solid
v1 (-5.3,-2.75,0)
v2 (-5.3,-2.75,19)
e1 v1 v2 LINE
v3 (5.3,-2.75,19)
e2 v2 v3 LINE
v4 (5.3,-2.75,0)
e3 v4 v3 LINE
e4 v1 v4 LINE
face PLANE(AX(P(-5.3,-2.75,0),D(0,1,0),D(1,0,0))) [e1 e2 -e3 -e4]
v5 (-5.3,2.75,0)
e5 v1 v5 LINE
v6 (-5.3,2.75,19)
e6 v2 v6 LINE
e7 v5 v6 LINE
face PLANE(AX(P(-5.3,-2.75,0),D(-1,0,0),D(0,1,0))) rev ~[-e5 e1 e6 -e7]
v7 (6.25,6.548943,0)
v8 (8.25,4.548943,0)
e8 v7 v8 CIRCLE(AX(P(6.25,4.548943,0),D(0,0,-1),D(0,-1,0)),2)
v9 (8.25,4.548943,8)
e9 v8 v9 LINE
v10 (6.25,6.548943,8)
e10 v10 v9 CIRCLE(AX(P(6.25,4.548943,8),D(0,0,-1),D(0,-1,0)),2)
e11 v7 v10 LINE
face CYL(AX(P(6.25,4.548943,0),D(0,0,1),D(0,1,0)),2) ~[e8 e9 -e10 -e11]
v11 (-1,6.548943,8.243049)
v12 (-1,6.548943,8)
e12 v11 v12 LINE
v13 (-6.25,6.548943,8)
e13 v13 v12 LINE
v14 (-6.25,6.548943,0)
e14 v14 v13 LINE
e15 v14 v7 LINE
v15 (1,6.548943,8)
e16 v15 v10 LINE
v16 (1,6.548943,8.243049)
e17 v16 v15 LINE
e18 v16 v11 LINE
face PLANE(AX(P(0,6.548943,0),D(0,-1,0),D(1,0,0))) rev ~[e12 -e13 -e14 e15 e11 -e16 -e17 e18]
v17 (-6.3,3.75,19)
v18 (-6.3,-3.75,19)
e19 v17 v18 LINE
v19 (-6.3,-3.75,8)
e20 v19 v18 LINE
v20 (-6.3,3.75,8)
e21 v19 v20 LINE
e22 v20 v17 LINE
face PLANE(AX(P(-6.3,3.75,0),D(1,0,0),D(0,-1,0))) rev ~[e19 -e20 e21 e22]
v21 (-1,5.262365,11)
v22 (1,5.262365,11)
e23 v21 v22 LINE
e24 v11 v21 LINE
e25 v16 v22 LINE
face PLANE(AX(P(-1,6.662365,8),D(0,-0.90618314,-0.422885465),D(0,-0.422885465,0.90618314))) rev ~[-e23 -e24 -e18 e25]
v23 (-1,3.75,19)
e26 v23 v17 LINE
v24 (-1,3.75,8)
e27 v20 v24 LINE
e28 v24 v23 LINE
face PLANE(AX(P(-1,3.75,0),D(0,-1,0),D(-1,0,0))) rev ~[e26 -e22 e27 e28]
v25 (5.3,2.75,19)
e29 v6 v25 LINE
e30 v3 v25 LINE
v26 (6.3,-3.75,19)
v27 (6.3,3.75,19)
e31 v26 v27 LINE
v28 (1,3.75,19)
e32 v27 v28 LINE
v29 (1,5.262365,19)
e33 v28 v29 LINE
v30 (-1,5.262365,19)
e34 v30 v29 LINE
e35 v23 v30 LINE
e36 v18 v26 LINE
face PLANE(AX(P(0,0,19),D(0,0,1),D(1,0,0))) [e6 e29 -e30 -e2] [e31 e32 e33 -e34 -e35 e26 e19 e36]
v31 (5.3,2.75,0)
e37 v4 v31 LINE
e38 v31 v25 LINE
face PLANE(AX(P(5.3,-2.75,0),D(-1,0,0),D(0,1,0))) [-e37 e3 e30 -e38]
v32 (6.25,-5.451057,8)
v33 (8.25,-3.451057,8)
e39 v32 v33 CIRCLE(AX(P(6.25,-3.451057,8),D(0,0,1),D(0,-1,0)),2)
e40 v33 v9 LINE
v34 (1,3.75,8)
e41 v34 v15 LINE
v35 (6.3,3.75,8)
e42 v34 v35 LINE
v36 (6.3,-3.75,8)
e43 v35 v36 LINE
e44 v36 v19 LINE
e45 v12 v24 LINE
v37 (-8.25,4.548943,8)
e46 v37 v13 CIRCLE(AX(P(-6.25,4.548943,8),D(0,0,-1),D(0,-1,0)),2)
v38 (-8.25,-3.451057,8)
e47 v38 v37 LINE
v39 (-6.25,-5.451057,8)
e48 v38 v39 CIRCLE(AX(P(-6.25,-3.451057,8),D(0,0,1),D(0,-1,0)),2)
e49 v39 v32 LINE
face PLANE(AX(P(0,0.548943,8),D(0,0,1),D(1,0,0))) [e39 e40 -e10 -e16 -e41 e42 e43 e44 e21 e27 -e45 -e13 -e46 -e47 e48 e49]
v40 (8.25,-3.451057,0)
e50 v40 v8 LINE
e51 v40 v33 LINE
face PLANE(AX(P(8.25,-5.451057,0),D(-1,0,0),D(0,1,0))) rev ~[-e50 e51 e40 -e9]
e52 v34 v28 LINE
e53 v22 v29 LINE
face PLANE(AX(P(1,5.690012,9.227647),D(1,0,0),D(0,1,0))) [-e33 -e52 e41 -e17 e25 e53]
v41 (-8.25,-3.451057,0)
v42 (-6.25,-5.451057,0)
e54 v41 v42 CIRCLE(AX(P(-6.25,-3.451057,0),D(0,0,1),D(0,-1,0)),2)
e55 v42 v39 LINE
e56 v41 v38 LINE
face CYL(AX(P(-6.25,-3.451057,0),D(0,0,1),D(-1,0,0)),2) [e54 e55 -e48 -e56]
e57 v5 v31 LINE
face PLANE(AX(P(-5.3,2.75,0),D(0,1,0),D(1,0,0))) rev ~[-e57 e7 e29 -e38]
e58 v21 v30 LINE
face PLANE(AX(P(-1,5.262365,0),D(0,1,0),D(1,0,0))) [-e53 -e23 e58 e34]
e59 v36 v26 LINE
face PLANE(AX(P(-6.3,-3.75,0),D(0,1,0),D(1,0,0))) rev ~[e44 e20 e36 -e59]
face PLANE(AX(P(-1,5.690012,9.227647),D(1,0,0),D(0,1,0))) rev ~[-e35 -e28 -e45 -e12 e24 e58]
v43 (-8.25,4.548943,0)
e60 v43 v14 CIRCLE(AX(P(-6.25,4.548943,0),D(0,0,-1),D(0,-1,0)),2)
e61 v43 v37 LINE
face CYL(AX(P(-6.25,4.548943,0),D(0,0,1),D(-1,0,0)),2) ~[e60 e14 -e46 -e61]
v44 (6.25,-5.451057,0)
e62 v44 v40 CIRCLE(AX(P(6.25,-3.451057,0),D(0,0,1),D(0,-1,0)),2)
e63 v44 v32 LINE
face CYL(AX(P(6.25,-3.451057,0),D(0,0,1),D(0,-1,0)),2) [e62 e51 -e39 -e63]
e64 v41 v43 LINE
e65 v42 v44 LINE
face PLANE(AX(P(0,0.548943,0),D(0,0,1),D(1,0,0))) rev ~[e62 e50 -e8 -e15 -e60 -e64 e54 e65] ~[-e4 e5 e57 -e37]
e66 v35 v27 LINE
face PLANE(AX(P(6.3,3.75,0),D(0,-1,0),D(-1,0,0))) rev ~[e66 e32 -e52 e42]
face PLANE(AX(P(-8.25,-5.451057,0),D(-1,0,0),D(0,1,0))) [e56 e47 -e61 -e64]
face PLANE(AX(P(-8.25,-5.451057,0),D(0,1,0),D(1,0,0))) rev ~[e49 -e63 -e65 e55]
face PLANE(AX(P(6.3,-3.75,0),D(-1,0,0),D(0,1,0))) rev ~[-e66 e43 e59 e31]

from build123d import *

# Parameters (mm, degrees)
F0_W        = 10.6
F0_H        = 5.5
F0_W_2      = 2
F0_H_2      = 1.512365222
F1_DEPTH    = 19
F0_W_3      = 16.5
F0_H_3      = 12
F2_DEPTH    = 8
F3_R        = 2
F4_T4_DEPTH = 2


# Not quite as in the source:
# - a fillet or chamfer that OpenCascade refuses, or shapes differently, is made with other operations: its cross-section is extruded or revolved along the edge and cut away or added


with BuildPart() as f1:
    # F0 (on Top) → F1 (new body)
    with BuildSketch(Plane.XY):
        Polygon((-6.3, -3.75), (6.3, -3.75), (6.3, 3.75), (1, 3.75), (-1, 3.75), (-6.3, 3.75), align=None)
        Rectangle(F0_W, F0_H, mode=Mode.SUBTRACT)
        with Locations((0, 4.506182611)):
            Rectangle(F0_W_2, F0_H_2)
    extrude(amount=F1_DEPTH)

    # F0 (on Top) → F2 (join)
    with BuildSketch(Plane.XY):
        with Locations((0, 0.5489425384)):
            Rectangle(F0_W_3, F0_H_3)
        Polygon((6.3, 3.75), (6.3, -3.75), (-6.3, -3.75), (-6.3, 3.75), (-1, 3.75), (-1, 5.262365222), (1, 5.262365222), (1, 3.75), align=None, mode=Mode.SUBTRACT)
    extrude(amount=F2_DEPTH)

    # F3
    f3_edges = [f1.edges().sort_by_distance(p)[0] for p in [
        (-8.25, -5.451057, 4),
        (8.25, -5.451057, 4),
        (8.25, 6.548943, 4),
        (-8.25, 6.548943, 4),
    ]]
    fillet(f3_edges, radius=F3_R)

    # F4: chamfer of 3 x 1.4 on 1 edges, made by hand


with BuildPart() as f4_tool2:
    # F4_s3 → F4_t4 (new body)
    with BuildSketch(Plane.YZ.offset(-1)):
        Polygon((6.662365222, 8), (5.262365222, 11), (5.262365222, 8), align=None)
    extrude(amount=F4_T4_DEPTH)

    split(bisect_by=Plane.XZ.offset(-6.5489425384), keep=Keep.TOP)


with BuildPart() as f1_1:
    add(f1.part)

    # F4_t1: union F4_tool2
    add(f4_tool2.part)


solid = f1_1.part
